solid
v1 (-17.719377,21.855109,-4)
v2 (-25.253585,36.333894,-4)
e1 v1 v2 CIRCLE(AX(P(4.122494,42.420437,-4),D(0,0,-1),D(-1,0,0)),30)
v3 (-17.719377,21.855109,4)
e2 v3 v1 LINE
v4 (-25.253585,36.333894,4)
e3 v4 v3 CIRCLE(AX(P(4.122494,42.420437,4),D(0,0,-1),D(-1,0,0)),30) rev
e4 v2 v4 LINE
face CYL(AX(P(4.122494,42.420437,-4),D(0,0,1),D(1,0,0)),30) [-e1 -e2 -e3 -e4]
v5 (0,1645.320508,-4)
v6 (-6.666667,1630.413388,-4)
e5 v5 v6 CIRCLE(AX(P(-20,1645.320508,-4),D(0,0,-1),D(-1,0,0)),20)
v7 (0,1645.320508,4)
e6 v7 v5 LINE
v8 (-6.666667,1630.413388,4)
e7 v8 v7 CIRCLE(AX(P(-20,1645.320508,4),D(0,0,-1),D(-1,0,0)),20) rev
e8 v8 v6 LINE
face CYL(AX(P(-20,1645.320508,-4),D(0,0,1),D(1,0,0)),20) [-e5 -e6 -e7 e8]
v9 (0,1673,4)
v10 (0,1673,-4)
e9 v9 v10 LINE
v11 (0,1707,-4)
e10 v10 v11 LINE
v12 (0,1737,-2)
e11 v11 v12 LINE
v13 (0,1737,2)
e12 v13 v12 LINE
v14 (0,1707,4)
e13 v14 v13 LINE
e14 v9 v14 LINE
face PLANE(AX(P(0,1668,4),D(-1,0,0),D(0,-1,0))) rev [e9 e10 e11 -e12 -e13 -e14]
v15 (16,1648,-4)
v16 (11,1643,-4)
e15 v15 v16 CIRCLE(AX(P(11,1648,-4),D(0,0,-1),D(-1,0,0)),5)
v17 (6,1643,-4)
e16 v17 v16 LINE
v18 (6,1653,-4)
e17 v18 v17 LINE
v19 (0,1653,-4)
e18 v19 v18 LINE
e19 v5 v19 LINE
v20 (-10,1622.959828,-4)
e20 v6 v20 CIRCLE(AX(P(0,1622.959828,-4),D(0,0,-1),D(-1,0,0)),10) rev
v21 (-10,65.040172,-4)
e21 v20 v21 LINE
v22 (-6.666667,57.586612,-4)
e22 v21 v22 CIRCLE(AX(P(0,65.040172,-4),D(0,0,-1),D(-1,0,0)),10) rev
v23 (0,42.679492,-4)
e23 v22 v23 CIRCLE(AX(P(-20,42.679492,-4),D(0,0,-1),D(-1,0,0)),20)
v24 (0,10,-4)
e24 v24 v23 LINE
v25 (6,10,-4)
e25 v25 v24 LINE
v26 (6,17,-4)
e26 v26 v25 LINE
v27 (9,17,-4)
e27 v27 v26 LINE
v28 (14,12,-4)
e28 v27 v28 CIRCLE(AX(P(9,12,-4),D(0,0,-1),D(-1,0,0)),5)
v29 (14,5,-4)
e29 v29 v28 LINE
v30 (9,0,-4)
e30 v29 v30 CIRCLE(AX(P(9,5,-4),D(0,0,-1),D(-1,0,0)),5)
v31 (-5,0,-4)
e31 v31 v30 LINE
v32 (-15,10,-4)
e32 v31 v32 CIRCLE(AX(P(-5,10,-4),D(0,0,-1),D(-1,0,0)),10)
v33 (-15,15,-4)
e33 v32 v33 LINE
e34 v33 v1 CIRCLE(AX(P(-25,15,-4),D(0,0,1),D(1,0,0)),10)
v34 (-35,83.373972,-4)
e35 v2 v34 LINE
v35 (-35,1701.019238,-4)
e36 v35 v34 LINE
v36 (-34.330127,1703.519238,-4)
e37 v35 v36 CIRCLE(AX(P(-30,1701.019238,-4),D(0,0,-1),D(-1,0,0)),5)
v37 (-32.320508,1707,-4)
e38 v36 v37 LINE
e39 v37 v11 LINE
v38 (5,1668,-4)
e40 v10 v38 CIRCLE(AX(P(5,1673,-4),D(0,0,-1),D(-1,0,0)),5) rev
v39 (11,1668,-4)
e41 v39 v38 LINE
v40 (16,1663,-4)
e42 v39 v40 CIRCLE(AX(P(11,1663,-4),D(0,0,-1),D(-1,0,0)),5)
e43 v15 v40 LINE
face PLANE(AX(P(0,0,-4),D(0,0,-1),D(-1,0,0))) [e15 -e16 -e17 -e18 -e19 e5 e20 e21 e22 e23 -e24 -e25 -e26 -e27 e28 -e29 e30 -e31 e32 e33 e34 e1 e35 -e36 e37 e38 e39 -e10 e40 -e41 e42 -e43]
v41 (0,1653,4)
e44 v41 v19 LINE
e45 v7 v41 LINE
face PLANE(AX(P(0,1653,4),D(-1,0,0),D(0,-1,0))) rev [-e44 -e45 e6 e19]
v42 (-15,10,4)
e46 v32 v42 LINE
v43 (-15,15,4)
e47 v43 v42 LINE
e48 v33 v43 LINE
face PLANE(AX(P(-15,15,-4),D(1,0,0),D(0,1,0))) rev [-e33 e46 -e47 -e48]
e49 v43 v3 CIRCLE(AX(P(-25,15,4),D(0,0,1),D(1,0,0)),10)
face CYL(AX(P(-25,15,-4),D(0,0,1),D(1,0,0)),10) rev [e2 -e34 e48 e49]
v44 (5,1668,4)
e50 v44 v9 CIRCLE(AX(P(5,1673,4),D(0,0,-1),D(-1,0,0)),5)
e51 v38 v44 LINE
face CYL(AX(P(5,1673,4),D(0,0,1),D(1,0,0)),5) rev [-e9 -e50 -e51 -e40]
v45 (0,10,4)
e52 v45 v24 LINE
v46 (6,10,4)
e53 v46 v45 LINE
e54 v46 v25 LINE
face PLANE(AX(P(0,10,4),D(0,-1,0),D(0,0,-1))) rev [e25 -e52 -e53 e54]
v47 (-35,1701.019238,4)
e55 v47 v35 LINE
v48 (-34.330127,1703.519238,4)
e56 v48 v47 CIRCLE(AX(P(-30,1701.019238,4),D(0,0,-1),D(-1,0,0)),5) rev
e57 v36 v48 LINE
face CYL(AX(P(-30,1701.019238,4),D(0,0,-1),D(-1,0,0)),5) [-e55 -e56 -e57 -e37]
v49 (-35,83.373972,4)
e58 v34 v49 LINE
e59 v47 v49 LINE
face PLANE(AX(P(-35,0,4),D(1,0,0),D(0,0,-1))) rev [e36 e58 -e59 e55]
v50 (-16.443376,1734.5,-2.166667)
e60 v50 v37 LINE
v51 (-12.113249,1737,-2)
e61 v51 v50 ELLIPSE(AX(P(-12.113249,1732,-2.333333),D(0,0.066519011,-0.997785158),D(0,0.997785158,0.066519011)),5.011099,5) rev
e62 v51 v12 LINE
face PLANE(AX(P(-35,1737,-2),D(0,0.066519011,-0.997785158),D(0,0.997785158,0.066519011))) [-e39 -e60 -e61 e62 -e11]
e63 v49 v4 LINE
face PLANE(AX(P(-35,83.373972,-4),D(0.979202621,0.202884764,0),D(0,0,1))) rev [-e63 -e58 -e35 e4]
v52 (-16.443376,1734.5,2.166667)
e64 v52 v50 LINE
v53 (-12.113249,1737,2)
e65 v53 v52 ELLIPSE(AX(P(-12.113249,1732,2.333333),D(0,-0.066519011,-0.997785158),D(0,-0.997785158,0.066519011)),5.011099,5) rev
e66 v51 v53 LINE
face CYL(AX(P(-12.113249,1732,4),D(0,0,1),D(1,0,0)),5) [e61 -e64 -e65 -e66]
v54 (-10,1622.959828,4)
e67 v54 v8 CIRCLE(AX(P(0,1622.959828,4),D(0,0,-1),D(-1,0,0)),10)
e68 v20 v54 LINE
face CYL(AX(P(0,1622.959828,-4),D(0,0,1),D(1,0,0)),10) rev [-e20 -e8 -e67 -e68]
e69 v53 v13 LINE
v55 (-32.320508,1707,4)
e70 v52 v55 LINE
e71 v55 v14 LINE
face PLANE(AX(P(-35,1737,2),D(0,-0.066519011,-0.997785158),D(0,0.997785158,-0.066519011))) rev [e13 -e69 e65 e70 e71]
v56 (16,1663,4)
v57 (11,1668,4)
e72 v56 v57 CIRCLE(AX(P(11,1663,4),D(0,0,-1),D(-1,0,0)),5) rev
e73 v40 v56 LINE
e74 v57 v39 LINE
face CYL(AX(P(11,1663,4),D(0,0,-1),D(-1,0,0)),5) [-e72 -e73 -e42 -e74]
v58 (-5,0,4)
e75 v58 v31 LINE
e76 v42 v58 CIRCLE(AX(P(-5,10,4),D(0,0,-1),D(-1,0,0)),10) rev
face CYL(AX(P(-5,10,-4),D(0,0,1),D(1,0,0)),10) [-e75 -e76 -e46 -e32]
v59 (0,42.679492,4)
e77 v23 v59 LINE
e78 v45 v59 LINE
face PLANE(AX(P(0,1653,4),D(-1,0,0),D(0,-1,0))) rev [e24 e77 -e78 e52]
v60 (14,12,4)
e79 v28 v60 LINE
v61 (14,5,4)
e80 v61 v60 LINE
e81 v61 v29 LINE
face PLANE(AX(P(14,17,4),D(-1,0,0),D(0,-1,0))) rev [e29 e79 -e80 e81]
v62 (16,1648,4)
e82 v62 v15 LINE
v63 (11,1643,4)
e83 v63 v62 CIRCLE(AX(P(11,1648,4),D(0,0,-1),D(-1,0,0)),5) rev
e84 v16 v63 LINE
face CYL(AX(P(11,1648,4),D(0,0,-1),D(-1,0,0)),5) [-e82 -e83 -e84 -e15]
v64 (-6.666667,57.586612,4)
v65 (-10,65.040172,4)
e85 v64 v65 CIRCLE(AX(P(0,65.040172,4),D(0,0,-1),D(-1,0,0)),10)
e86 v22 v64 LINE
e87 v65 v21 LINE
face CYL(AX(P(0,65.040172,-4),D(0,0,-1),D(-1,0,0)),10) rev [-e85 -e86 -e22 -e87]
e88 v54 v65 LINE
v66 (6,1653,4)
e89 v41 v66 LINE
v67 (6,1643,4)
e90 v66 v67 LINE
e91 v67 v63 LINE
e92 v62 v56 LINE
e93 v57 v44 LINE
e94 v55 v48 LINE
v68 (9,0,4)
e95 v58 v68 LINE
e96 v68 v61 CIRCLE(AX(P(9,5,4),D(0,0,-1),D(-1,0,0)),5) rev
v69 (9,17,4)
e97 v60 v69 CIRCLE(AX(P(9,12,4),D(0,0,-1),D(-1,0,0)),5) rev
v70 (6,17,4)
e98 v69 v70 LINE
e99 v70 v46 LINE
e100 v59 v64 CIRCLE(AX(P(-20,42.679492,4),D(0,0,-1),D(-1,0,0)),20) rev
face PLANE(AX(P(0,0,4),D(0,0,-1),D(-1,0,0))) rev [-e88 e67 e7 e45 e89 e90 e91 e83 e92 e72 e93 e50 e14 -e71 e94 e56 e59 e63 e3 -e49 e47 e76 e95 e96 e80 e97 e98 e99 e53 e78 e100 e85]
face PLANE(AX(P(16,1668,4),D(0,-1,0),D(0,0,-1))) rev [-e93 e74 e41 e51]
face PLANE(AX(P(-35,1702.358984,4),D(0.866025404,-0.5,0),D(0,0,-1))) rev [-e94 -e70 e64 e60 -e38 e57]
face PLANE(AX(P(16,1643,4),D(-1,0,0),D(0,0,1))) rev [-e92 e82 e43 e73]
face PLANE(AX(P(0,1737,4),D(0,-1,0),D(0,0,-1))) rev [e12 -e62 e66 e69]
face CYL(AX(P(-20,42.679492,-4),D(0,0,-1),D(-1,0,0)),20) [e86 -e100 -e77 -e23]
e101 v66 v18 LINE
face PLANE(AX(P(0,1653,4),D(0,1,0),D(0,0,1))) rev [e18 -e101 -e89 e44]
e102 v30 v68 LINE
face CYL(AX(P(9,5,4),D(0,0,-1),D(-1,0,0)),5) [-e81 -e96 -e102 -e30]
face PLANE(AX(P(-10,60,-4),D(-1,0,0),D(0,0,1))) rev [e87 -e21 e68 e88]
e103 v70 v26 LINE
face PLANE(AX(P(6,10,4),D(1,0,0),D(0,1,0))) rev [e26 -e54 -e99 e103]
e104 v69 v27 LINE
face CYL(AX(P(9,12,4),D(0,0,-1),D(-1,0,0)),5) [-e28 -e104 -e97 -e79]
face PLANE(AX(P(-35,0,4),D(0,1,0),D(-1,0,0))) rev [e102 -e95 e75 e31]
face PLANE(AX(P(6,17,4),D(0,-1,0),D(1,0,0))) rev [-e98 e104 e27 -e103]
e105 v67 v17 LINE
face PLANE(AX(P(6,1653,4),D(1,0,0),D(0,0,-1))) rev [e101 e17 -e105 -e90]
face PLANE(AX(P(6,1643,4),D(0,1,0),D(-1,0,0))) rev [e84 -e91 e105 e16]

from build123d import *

# Parameters (mm, degrees)
EXTRUDE_1_DEPTH          = 4
CHAMFER_1_SIZE           = 20
CHAMFER_1_SIZE2          = 34.641016151
FILLET_1_R               = 5
SKETCH_2_W               = 20
SKETCH_2_H               = 1568
CUT_EXTRUDE_1_DEPTH      = 1738.371002406
FILLET_2_R               = 20
FILLET_3_R               = 10
CUT_EXTRUDE_2_DEPTH      = 1738.371002406
CUT_EXTRUDE_2_DEPTH_BACK = 1738.371002406
FILLET_4_R               = 10
CHAMFER_START            = -30
CHAMFER_4_OUTLINE_W      = 63
CHAMFER_4_OUTLINE_H      = 8
CHAMFER_4_DEPTH          = 12.643216867
FILLET_6_R               = 30
CUT_EXTRUDE_3_DEPTH      = 1738.357188375


with BuildPart() as part:
    # Эскиз1 → Бобышка-Вытянуть1 (new, symmetric)
    with BuildSketch(Plane.XY):
        Polygon((0, 1653), (6, 1653), (6, 1643), (16, 1643), (16, 1668), (0, 1668), (0, 1737), (-35, 1737), (-35, 0), (14, 0), (14, 17), (6, 17), (6, 10), (0, 10), align=None)
    extrude(amount=EXTRUDE_1_DEPTH, both=True)

    # Фаска1
    chamfer_1_edges = [part.edges().sort_by_distance(p)[0] for p in [
        (-35, 1737, 0),
    ]]
    chamfer_1_side = [part.faces().sort_by_distance(p)[0] for p in [
        (-17.5, 1737, 0),
    ]]
    chamfer(chamfer_1_edges, length=CHAMFER_1_SIZE, length2=CHAMFER_1_SIZE2, reference=chamfer_1_side[0])

    # Скругление1
    fillet_1_edges = [part.edges().sort_by_distance(p)[0] for p in [
        (0, 1668, 0),
        (16, 1668, 0),
        (16, 1643, 0),
        (14, 17, 0),
        (14, 0, 0),
        (-35, 1702.358983849, 0),
        (-15, 1737, 0),
    ]]
    fillet(fillet_1_edges, radius=FILLET_1_R)

    # Эскиз2 → Вырез-Вытянуть1 (cut, through all)
    with BuildSketch(Plane.XY.offset(4)):
        with Locations((0, 844)):
            Rectangle(SKETCH_2_W, SKETCH_2_H)
    extrude(amount=-CUT_EXTRUDE_1_DEPTH, mode=Mode.SUBTRACT)

    # Скругление2
    # the kernel refuses this fillet: 20 mm, written as the material it takes off along each edge
    with BuildSketch(Plane(origin=(0, 1628, 47.301270189), x_dir=(0, 1, 0), z_dir=(0, 0, -1))) as fillet_2_piece_1:
        with BuildLine():
            CenterArc((17.320508076, -20), FILLET_2_R, 90, 60)
            Line((0, -10), (-0.346410162, -9.8))
            ThreePointArc((-0.346410162, -9.8), (-0.4, -5), (-0.4, 0))
            Line((-0.4, 0), (0, 0.4))
            Line((0, 0.4), (17.320508076, 0.4))
            Line((17.320508076, 0.4), (17.320508076, 0))
        make_face()
    extrude(amount=94.602540378, mode=Mode.SUBTRACT)
    with BuildSketch(Plane(origin=(0, 60, -47.301270189), x_dir=(-1, 0, 0), z_dir=(0, 0, 1))) as fillet_2_piece_2:
        with BuildLine():
            CenterArc((20, 17.320508076), FILLET_2_R, 180, 60)
            Line((0, 17.320508076), (-0.4, 17.320508076))
            Line((-0.4, 17.320508076), (-0.4, 0))
            Line((-0.4, 0), (0, -0.4))
            ThreePointArc((0, -0.4), (5, -0.4), (9.8, -0.346410162))
            Line((9.8, -0.346410162), (10, 0))
        make_face()
    extrude(amount=94.602540378, mode=Mode.SUBTRACT)

    # Скругление3
    fillet_3_edges = [part.edges().sort_by_distance(p)[0] for p in [
        (-10, 1628, 0),
        (-10, 60, 0),
    ]]
    fillet(fillet_3_edges, radius=FILLET_3_R)

    # Эскиз3 → Вырез-Вытянуть2 (cut, two sides: drawn at the far end of the back side and taken through both)
    with BuildSketch(Plane.XY.offset(4).offset(-CUT_EXTRUDE_2_DEPTH_BACK)):
        with BuildLine():
            Line((-15, 15), (-15, 0))
            Line((-15, 0), (-47.109663931, 0))
            Line((-47.109663931, 0), (-47.109663931, 63.037421146))
            Line((-47.109663931, 63.037421146), (-35, 63.037421146))
            Line((-35, 63.037421146), (-35, 25))
            Line((-35, 25), (-25, 25))
            ThreePointArc((-25, 25), (-17.928932188, 22.071067812), (-15, 15))
        make_face()
    extrude(amount=CUT_EXTRUDE_2_DEPTH + CUT_EXTRUDE_2_DEPTH_BACK, mode=Mode.SUBTRACT)

    # Скругление4
    fillet_4_edges = [part.edges().sort_by_distance(p)[0] for p in [
        (-15, 0, 0),
    ]]
    fillet(fillet_4_edges, radius=FILLET_4_R)

    # Фаска4: read off the stored shape, not the designer's step
    # Фаска4 outline → Фаска4 (cut)
    with BuildSketch(Plane(origin=(0, 0, 0), x_dir=(-0.2028847643439639, 0.9792026207057936, 0), z_dir=(0.9792026207057936, 0.2028847643439639, 0)).offset(CHAMFER_START)):
        with Locations((58.5, 0)):
            Rectangle(CHAMFER_4_OUTLINE_W, CHAMFER_4_OUTLINE_H)
    extrude(amount=CHAMFER_4_DEPTH, mode=Mode.SUBTRACT)

    # Скругление6
    fillet_6_edges = [part.edges().sort_by_distance(p)[0] for p in [
        (-22.857142857, 24.767710237, 0),
    ]]
    fillet(fillet_6_edges, radius=FILLET_6_R)

    # Эскиз4 → Вырез-Вытянуть3 (cut, through all)
    with BuildSketch(Plane(origin=(0, 0, 0), x_dir=(0, 0, -1), z_dir=(1, 0, 0))):
        Polygon((-4, 1707), (-4, 1737), (-2, 1737), align=None)
    cut_extrude_3 = extrude(amount=-CUT_EXTRUDE_3_DEPTH, mode=Mode.SUBTRACT)

    # Зеркальное отражение1: Вырез-Вытянуть3 across plane
    add(cut_extrude_3.mirror(Plane.XY), mode=Mode.SUBTRACT)


solid = part.part
